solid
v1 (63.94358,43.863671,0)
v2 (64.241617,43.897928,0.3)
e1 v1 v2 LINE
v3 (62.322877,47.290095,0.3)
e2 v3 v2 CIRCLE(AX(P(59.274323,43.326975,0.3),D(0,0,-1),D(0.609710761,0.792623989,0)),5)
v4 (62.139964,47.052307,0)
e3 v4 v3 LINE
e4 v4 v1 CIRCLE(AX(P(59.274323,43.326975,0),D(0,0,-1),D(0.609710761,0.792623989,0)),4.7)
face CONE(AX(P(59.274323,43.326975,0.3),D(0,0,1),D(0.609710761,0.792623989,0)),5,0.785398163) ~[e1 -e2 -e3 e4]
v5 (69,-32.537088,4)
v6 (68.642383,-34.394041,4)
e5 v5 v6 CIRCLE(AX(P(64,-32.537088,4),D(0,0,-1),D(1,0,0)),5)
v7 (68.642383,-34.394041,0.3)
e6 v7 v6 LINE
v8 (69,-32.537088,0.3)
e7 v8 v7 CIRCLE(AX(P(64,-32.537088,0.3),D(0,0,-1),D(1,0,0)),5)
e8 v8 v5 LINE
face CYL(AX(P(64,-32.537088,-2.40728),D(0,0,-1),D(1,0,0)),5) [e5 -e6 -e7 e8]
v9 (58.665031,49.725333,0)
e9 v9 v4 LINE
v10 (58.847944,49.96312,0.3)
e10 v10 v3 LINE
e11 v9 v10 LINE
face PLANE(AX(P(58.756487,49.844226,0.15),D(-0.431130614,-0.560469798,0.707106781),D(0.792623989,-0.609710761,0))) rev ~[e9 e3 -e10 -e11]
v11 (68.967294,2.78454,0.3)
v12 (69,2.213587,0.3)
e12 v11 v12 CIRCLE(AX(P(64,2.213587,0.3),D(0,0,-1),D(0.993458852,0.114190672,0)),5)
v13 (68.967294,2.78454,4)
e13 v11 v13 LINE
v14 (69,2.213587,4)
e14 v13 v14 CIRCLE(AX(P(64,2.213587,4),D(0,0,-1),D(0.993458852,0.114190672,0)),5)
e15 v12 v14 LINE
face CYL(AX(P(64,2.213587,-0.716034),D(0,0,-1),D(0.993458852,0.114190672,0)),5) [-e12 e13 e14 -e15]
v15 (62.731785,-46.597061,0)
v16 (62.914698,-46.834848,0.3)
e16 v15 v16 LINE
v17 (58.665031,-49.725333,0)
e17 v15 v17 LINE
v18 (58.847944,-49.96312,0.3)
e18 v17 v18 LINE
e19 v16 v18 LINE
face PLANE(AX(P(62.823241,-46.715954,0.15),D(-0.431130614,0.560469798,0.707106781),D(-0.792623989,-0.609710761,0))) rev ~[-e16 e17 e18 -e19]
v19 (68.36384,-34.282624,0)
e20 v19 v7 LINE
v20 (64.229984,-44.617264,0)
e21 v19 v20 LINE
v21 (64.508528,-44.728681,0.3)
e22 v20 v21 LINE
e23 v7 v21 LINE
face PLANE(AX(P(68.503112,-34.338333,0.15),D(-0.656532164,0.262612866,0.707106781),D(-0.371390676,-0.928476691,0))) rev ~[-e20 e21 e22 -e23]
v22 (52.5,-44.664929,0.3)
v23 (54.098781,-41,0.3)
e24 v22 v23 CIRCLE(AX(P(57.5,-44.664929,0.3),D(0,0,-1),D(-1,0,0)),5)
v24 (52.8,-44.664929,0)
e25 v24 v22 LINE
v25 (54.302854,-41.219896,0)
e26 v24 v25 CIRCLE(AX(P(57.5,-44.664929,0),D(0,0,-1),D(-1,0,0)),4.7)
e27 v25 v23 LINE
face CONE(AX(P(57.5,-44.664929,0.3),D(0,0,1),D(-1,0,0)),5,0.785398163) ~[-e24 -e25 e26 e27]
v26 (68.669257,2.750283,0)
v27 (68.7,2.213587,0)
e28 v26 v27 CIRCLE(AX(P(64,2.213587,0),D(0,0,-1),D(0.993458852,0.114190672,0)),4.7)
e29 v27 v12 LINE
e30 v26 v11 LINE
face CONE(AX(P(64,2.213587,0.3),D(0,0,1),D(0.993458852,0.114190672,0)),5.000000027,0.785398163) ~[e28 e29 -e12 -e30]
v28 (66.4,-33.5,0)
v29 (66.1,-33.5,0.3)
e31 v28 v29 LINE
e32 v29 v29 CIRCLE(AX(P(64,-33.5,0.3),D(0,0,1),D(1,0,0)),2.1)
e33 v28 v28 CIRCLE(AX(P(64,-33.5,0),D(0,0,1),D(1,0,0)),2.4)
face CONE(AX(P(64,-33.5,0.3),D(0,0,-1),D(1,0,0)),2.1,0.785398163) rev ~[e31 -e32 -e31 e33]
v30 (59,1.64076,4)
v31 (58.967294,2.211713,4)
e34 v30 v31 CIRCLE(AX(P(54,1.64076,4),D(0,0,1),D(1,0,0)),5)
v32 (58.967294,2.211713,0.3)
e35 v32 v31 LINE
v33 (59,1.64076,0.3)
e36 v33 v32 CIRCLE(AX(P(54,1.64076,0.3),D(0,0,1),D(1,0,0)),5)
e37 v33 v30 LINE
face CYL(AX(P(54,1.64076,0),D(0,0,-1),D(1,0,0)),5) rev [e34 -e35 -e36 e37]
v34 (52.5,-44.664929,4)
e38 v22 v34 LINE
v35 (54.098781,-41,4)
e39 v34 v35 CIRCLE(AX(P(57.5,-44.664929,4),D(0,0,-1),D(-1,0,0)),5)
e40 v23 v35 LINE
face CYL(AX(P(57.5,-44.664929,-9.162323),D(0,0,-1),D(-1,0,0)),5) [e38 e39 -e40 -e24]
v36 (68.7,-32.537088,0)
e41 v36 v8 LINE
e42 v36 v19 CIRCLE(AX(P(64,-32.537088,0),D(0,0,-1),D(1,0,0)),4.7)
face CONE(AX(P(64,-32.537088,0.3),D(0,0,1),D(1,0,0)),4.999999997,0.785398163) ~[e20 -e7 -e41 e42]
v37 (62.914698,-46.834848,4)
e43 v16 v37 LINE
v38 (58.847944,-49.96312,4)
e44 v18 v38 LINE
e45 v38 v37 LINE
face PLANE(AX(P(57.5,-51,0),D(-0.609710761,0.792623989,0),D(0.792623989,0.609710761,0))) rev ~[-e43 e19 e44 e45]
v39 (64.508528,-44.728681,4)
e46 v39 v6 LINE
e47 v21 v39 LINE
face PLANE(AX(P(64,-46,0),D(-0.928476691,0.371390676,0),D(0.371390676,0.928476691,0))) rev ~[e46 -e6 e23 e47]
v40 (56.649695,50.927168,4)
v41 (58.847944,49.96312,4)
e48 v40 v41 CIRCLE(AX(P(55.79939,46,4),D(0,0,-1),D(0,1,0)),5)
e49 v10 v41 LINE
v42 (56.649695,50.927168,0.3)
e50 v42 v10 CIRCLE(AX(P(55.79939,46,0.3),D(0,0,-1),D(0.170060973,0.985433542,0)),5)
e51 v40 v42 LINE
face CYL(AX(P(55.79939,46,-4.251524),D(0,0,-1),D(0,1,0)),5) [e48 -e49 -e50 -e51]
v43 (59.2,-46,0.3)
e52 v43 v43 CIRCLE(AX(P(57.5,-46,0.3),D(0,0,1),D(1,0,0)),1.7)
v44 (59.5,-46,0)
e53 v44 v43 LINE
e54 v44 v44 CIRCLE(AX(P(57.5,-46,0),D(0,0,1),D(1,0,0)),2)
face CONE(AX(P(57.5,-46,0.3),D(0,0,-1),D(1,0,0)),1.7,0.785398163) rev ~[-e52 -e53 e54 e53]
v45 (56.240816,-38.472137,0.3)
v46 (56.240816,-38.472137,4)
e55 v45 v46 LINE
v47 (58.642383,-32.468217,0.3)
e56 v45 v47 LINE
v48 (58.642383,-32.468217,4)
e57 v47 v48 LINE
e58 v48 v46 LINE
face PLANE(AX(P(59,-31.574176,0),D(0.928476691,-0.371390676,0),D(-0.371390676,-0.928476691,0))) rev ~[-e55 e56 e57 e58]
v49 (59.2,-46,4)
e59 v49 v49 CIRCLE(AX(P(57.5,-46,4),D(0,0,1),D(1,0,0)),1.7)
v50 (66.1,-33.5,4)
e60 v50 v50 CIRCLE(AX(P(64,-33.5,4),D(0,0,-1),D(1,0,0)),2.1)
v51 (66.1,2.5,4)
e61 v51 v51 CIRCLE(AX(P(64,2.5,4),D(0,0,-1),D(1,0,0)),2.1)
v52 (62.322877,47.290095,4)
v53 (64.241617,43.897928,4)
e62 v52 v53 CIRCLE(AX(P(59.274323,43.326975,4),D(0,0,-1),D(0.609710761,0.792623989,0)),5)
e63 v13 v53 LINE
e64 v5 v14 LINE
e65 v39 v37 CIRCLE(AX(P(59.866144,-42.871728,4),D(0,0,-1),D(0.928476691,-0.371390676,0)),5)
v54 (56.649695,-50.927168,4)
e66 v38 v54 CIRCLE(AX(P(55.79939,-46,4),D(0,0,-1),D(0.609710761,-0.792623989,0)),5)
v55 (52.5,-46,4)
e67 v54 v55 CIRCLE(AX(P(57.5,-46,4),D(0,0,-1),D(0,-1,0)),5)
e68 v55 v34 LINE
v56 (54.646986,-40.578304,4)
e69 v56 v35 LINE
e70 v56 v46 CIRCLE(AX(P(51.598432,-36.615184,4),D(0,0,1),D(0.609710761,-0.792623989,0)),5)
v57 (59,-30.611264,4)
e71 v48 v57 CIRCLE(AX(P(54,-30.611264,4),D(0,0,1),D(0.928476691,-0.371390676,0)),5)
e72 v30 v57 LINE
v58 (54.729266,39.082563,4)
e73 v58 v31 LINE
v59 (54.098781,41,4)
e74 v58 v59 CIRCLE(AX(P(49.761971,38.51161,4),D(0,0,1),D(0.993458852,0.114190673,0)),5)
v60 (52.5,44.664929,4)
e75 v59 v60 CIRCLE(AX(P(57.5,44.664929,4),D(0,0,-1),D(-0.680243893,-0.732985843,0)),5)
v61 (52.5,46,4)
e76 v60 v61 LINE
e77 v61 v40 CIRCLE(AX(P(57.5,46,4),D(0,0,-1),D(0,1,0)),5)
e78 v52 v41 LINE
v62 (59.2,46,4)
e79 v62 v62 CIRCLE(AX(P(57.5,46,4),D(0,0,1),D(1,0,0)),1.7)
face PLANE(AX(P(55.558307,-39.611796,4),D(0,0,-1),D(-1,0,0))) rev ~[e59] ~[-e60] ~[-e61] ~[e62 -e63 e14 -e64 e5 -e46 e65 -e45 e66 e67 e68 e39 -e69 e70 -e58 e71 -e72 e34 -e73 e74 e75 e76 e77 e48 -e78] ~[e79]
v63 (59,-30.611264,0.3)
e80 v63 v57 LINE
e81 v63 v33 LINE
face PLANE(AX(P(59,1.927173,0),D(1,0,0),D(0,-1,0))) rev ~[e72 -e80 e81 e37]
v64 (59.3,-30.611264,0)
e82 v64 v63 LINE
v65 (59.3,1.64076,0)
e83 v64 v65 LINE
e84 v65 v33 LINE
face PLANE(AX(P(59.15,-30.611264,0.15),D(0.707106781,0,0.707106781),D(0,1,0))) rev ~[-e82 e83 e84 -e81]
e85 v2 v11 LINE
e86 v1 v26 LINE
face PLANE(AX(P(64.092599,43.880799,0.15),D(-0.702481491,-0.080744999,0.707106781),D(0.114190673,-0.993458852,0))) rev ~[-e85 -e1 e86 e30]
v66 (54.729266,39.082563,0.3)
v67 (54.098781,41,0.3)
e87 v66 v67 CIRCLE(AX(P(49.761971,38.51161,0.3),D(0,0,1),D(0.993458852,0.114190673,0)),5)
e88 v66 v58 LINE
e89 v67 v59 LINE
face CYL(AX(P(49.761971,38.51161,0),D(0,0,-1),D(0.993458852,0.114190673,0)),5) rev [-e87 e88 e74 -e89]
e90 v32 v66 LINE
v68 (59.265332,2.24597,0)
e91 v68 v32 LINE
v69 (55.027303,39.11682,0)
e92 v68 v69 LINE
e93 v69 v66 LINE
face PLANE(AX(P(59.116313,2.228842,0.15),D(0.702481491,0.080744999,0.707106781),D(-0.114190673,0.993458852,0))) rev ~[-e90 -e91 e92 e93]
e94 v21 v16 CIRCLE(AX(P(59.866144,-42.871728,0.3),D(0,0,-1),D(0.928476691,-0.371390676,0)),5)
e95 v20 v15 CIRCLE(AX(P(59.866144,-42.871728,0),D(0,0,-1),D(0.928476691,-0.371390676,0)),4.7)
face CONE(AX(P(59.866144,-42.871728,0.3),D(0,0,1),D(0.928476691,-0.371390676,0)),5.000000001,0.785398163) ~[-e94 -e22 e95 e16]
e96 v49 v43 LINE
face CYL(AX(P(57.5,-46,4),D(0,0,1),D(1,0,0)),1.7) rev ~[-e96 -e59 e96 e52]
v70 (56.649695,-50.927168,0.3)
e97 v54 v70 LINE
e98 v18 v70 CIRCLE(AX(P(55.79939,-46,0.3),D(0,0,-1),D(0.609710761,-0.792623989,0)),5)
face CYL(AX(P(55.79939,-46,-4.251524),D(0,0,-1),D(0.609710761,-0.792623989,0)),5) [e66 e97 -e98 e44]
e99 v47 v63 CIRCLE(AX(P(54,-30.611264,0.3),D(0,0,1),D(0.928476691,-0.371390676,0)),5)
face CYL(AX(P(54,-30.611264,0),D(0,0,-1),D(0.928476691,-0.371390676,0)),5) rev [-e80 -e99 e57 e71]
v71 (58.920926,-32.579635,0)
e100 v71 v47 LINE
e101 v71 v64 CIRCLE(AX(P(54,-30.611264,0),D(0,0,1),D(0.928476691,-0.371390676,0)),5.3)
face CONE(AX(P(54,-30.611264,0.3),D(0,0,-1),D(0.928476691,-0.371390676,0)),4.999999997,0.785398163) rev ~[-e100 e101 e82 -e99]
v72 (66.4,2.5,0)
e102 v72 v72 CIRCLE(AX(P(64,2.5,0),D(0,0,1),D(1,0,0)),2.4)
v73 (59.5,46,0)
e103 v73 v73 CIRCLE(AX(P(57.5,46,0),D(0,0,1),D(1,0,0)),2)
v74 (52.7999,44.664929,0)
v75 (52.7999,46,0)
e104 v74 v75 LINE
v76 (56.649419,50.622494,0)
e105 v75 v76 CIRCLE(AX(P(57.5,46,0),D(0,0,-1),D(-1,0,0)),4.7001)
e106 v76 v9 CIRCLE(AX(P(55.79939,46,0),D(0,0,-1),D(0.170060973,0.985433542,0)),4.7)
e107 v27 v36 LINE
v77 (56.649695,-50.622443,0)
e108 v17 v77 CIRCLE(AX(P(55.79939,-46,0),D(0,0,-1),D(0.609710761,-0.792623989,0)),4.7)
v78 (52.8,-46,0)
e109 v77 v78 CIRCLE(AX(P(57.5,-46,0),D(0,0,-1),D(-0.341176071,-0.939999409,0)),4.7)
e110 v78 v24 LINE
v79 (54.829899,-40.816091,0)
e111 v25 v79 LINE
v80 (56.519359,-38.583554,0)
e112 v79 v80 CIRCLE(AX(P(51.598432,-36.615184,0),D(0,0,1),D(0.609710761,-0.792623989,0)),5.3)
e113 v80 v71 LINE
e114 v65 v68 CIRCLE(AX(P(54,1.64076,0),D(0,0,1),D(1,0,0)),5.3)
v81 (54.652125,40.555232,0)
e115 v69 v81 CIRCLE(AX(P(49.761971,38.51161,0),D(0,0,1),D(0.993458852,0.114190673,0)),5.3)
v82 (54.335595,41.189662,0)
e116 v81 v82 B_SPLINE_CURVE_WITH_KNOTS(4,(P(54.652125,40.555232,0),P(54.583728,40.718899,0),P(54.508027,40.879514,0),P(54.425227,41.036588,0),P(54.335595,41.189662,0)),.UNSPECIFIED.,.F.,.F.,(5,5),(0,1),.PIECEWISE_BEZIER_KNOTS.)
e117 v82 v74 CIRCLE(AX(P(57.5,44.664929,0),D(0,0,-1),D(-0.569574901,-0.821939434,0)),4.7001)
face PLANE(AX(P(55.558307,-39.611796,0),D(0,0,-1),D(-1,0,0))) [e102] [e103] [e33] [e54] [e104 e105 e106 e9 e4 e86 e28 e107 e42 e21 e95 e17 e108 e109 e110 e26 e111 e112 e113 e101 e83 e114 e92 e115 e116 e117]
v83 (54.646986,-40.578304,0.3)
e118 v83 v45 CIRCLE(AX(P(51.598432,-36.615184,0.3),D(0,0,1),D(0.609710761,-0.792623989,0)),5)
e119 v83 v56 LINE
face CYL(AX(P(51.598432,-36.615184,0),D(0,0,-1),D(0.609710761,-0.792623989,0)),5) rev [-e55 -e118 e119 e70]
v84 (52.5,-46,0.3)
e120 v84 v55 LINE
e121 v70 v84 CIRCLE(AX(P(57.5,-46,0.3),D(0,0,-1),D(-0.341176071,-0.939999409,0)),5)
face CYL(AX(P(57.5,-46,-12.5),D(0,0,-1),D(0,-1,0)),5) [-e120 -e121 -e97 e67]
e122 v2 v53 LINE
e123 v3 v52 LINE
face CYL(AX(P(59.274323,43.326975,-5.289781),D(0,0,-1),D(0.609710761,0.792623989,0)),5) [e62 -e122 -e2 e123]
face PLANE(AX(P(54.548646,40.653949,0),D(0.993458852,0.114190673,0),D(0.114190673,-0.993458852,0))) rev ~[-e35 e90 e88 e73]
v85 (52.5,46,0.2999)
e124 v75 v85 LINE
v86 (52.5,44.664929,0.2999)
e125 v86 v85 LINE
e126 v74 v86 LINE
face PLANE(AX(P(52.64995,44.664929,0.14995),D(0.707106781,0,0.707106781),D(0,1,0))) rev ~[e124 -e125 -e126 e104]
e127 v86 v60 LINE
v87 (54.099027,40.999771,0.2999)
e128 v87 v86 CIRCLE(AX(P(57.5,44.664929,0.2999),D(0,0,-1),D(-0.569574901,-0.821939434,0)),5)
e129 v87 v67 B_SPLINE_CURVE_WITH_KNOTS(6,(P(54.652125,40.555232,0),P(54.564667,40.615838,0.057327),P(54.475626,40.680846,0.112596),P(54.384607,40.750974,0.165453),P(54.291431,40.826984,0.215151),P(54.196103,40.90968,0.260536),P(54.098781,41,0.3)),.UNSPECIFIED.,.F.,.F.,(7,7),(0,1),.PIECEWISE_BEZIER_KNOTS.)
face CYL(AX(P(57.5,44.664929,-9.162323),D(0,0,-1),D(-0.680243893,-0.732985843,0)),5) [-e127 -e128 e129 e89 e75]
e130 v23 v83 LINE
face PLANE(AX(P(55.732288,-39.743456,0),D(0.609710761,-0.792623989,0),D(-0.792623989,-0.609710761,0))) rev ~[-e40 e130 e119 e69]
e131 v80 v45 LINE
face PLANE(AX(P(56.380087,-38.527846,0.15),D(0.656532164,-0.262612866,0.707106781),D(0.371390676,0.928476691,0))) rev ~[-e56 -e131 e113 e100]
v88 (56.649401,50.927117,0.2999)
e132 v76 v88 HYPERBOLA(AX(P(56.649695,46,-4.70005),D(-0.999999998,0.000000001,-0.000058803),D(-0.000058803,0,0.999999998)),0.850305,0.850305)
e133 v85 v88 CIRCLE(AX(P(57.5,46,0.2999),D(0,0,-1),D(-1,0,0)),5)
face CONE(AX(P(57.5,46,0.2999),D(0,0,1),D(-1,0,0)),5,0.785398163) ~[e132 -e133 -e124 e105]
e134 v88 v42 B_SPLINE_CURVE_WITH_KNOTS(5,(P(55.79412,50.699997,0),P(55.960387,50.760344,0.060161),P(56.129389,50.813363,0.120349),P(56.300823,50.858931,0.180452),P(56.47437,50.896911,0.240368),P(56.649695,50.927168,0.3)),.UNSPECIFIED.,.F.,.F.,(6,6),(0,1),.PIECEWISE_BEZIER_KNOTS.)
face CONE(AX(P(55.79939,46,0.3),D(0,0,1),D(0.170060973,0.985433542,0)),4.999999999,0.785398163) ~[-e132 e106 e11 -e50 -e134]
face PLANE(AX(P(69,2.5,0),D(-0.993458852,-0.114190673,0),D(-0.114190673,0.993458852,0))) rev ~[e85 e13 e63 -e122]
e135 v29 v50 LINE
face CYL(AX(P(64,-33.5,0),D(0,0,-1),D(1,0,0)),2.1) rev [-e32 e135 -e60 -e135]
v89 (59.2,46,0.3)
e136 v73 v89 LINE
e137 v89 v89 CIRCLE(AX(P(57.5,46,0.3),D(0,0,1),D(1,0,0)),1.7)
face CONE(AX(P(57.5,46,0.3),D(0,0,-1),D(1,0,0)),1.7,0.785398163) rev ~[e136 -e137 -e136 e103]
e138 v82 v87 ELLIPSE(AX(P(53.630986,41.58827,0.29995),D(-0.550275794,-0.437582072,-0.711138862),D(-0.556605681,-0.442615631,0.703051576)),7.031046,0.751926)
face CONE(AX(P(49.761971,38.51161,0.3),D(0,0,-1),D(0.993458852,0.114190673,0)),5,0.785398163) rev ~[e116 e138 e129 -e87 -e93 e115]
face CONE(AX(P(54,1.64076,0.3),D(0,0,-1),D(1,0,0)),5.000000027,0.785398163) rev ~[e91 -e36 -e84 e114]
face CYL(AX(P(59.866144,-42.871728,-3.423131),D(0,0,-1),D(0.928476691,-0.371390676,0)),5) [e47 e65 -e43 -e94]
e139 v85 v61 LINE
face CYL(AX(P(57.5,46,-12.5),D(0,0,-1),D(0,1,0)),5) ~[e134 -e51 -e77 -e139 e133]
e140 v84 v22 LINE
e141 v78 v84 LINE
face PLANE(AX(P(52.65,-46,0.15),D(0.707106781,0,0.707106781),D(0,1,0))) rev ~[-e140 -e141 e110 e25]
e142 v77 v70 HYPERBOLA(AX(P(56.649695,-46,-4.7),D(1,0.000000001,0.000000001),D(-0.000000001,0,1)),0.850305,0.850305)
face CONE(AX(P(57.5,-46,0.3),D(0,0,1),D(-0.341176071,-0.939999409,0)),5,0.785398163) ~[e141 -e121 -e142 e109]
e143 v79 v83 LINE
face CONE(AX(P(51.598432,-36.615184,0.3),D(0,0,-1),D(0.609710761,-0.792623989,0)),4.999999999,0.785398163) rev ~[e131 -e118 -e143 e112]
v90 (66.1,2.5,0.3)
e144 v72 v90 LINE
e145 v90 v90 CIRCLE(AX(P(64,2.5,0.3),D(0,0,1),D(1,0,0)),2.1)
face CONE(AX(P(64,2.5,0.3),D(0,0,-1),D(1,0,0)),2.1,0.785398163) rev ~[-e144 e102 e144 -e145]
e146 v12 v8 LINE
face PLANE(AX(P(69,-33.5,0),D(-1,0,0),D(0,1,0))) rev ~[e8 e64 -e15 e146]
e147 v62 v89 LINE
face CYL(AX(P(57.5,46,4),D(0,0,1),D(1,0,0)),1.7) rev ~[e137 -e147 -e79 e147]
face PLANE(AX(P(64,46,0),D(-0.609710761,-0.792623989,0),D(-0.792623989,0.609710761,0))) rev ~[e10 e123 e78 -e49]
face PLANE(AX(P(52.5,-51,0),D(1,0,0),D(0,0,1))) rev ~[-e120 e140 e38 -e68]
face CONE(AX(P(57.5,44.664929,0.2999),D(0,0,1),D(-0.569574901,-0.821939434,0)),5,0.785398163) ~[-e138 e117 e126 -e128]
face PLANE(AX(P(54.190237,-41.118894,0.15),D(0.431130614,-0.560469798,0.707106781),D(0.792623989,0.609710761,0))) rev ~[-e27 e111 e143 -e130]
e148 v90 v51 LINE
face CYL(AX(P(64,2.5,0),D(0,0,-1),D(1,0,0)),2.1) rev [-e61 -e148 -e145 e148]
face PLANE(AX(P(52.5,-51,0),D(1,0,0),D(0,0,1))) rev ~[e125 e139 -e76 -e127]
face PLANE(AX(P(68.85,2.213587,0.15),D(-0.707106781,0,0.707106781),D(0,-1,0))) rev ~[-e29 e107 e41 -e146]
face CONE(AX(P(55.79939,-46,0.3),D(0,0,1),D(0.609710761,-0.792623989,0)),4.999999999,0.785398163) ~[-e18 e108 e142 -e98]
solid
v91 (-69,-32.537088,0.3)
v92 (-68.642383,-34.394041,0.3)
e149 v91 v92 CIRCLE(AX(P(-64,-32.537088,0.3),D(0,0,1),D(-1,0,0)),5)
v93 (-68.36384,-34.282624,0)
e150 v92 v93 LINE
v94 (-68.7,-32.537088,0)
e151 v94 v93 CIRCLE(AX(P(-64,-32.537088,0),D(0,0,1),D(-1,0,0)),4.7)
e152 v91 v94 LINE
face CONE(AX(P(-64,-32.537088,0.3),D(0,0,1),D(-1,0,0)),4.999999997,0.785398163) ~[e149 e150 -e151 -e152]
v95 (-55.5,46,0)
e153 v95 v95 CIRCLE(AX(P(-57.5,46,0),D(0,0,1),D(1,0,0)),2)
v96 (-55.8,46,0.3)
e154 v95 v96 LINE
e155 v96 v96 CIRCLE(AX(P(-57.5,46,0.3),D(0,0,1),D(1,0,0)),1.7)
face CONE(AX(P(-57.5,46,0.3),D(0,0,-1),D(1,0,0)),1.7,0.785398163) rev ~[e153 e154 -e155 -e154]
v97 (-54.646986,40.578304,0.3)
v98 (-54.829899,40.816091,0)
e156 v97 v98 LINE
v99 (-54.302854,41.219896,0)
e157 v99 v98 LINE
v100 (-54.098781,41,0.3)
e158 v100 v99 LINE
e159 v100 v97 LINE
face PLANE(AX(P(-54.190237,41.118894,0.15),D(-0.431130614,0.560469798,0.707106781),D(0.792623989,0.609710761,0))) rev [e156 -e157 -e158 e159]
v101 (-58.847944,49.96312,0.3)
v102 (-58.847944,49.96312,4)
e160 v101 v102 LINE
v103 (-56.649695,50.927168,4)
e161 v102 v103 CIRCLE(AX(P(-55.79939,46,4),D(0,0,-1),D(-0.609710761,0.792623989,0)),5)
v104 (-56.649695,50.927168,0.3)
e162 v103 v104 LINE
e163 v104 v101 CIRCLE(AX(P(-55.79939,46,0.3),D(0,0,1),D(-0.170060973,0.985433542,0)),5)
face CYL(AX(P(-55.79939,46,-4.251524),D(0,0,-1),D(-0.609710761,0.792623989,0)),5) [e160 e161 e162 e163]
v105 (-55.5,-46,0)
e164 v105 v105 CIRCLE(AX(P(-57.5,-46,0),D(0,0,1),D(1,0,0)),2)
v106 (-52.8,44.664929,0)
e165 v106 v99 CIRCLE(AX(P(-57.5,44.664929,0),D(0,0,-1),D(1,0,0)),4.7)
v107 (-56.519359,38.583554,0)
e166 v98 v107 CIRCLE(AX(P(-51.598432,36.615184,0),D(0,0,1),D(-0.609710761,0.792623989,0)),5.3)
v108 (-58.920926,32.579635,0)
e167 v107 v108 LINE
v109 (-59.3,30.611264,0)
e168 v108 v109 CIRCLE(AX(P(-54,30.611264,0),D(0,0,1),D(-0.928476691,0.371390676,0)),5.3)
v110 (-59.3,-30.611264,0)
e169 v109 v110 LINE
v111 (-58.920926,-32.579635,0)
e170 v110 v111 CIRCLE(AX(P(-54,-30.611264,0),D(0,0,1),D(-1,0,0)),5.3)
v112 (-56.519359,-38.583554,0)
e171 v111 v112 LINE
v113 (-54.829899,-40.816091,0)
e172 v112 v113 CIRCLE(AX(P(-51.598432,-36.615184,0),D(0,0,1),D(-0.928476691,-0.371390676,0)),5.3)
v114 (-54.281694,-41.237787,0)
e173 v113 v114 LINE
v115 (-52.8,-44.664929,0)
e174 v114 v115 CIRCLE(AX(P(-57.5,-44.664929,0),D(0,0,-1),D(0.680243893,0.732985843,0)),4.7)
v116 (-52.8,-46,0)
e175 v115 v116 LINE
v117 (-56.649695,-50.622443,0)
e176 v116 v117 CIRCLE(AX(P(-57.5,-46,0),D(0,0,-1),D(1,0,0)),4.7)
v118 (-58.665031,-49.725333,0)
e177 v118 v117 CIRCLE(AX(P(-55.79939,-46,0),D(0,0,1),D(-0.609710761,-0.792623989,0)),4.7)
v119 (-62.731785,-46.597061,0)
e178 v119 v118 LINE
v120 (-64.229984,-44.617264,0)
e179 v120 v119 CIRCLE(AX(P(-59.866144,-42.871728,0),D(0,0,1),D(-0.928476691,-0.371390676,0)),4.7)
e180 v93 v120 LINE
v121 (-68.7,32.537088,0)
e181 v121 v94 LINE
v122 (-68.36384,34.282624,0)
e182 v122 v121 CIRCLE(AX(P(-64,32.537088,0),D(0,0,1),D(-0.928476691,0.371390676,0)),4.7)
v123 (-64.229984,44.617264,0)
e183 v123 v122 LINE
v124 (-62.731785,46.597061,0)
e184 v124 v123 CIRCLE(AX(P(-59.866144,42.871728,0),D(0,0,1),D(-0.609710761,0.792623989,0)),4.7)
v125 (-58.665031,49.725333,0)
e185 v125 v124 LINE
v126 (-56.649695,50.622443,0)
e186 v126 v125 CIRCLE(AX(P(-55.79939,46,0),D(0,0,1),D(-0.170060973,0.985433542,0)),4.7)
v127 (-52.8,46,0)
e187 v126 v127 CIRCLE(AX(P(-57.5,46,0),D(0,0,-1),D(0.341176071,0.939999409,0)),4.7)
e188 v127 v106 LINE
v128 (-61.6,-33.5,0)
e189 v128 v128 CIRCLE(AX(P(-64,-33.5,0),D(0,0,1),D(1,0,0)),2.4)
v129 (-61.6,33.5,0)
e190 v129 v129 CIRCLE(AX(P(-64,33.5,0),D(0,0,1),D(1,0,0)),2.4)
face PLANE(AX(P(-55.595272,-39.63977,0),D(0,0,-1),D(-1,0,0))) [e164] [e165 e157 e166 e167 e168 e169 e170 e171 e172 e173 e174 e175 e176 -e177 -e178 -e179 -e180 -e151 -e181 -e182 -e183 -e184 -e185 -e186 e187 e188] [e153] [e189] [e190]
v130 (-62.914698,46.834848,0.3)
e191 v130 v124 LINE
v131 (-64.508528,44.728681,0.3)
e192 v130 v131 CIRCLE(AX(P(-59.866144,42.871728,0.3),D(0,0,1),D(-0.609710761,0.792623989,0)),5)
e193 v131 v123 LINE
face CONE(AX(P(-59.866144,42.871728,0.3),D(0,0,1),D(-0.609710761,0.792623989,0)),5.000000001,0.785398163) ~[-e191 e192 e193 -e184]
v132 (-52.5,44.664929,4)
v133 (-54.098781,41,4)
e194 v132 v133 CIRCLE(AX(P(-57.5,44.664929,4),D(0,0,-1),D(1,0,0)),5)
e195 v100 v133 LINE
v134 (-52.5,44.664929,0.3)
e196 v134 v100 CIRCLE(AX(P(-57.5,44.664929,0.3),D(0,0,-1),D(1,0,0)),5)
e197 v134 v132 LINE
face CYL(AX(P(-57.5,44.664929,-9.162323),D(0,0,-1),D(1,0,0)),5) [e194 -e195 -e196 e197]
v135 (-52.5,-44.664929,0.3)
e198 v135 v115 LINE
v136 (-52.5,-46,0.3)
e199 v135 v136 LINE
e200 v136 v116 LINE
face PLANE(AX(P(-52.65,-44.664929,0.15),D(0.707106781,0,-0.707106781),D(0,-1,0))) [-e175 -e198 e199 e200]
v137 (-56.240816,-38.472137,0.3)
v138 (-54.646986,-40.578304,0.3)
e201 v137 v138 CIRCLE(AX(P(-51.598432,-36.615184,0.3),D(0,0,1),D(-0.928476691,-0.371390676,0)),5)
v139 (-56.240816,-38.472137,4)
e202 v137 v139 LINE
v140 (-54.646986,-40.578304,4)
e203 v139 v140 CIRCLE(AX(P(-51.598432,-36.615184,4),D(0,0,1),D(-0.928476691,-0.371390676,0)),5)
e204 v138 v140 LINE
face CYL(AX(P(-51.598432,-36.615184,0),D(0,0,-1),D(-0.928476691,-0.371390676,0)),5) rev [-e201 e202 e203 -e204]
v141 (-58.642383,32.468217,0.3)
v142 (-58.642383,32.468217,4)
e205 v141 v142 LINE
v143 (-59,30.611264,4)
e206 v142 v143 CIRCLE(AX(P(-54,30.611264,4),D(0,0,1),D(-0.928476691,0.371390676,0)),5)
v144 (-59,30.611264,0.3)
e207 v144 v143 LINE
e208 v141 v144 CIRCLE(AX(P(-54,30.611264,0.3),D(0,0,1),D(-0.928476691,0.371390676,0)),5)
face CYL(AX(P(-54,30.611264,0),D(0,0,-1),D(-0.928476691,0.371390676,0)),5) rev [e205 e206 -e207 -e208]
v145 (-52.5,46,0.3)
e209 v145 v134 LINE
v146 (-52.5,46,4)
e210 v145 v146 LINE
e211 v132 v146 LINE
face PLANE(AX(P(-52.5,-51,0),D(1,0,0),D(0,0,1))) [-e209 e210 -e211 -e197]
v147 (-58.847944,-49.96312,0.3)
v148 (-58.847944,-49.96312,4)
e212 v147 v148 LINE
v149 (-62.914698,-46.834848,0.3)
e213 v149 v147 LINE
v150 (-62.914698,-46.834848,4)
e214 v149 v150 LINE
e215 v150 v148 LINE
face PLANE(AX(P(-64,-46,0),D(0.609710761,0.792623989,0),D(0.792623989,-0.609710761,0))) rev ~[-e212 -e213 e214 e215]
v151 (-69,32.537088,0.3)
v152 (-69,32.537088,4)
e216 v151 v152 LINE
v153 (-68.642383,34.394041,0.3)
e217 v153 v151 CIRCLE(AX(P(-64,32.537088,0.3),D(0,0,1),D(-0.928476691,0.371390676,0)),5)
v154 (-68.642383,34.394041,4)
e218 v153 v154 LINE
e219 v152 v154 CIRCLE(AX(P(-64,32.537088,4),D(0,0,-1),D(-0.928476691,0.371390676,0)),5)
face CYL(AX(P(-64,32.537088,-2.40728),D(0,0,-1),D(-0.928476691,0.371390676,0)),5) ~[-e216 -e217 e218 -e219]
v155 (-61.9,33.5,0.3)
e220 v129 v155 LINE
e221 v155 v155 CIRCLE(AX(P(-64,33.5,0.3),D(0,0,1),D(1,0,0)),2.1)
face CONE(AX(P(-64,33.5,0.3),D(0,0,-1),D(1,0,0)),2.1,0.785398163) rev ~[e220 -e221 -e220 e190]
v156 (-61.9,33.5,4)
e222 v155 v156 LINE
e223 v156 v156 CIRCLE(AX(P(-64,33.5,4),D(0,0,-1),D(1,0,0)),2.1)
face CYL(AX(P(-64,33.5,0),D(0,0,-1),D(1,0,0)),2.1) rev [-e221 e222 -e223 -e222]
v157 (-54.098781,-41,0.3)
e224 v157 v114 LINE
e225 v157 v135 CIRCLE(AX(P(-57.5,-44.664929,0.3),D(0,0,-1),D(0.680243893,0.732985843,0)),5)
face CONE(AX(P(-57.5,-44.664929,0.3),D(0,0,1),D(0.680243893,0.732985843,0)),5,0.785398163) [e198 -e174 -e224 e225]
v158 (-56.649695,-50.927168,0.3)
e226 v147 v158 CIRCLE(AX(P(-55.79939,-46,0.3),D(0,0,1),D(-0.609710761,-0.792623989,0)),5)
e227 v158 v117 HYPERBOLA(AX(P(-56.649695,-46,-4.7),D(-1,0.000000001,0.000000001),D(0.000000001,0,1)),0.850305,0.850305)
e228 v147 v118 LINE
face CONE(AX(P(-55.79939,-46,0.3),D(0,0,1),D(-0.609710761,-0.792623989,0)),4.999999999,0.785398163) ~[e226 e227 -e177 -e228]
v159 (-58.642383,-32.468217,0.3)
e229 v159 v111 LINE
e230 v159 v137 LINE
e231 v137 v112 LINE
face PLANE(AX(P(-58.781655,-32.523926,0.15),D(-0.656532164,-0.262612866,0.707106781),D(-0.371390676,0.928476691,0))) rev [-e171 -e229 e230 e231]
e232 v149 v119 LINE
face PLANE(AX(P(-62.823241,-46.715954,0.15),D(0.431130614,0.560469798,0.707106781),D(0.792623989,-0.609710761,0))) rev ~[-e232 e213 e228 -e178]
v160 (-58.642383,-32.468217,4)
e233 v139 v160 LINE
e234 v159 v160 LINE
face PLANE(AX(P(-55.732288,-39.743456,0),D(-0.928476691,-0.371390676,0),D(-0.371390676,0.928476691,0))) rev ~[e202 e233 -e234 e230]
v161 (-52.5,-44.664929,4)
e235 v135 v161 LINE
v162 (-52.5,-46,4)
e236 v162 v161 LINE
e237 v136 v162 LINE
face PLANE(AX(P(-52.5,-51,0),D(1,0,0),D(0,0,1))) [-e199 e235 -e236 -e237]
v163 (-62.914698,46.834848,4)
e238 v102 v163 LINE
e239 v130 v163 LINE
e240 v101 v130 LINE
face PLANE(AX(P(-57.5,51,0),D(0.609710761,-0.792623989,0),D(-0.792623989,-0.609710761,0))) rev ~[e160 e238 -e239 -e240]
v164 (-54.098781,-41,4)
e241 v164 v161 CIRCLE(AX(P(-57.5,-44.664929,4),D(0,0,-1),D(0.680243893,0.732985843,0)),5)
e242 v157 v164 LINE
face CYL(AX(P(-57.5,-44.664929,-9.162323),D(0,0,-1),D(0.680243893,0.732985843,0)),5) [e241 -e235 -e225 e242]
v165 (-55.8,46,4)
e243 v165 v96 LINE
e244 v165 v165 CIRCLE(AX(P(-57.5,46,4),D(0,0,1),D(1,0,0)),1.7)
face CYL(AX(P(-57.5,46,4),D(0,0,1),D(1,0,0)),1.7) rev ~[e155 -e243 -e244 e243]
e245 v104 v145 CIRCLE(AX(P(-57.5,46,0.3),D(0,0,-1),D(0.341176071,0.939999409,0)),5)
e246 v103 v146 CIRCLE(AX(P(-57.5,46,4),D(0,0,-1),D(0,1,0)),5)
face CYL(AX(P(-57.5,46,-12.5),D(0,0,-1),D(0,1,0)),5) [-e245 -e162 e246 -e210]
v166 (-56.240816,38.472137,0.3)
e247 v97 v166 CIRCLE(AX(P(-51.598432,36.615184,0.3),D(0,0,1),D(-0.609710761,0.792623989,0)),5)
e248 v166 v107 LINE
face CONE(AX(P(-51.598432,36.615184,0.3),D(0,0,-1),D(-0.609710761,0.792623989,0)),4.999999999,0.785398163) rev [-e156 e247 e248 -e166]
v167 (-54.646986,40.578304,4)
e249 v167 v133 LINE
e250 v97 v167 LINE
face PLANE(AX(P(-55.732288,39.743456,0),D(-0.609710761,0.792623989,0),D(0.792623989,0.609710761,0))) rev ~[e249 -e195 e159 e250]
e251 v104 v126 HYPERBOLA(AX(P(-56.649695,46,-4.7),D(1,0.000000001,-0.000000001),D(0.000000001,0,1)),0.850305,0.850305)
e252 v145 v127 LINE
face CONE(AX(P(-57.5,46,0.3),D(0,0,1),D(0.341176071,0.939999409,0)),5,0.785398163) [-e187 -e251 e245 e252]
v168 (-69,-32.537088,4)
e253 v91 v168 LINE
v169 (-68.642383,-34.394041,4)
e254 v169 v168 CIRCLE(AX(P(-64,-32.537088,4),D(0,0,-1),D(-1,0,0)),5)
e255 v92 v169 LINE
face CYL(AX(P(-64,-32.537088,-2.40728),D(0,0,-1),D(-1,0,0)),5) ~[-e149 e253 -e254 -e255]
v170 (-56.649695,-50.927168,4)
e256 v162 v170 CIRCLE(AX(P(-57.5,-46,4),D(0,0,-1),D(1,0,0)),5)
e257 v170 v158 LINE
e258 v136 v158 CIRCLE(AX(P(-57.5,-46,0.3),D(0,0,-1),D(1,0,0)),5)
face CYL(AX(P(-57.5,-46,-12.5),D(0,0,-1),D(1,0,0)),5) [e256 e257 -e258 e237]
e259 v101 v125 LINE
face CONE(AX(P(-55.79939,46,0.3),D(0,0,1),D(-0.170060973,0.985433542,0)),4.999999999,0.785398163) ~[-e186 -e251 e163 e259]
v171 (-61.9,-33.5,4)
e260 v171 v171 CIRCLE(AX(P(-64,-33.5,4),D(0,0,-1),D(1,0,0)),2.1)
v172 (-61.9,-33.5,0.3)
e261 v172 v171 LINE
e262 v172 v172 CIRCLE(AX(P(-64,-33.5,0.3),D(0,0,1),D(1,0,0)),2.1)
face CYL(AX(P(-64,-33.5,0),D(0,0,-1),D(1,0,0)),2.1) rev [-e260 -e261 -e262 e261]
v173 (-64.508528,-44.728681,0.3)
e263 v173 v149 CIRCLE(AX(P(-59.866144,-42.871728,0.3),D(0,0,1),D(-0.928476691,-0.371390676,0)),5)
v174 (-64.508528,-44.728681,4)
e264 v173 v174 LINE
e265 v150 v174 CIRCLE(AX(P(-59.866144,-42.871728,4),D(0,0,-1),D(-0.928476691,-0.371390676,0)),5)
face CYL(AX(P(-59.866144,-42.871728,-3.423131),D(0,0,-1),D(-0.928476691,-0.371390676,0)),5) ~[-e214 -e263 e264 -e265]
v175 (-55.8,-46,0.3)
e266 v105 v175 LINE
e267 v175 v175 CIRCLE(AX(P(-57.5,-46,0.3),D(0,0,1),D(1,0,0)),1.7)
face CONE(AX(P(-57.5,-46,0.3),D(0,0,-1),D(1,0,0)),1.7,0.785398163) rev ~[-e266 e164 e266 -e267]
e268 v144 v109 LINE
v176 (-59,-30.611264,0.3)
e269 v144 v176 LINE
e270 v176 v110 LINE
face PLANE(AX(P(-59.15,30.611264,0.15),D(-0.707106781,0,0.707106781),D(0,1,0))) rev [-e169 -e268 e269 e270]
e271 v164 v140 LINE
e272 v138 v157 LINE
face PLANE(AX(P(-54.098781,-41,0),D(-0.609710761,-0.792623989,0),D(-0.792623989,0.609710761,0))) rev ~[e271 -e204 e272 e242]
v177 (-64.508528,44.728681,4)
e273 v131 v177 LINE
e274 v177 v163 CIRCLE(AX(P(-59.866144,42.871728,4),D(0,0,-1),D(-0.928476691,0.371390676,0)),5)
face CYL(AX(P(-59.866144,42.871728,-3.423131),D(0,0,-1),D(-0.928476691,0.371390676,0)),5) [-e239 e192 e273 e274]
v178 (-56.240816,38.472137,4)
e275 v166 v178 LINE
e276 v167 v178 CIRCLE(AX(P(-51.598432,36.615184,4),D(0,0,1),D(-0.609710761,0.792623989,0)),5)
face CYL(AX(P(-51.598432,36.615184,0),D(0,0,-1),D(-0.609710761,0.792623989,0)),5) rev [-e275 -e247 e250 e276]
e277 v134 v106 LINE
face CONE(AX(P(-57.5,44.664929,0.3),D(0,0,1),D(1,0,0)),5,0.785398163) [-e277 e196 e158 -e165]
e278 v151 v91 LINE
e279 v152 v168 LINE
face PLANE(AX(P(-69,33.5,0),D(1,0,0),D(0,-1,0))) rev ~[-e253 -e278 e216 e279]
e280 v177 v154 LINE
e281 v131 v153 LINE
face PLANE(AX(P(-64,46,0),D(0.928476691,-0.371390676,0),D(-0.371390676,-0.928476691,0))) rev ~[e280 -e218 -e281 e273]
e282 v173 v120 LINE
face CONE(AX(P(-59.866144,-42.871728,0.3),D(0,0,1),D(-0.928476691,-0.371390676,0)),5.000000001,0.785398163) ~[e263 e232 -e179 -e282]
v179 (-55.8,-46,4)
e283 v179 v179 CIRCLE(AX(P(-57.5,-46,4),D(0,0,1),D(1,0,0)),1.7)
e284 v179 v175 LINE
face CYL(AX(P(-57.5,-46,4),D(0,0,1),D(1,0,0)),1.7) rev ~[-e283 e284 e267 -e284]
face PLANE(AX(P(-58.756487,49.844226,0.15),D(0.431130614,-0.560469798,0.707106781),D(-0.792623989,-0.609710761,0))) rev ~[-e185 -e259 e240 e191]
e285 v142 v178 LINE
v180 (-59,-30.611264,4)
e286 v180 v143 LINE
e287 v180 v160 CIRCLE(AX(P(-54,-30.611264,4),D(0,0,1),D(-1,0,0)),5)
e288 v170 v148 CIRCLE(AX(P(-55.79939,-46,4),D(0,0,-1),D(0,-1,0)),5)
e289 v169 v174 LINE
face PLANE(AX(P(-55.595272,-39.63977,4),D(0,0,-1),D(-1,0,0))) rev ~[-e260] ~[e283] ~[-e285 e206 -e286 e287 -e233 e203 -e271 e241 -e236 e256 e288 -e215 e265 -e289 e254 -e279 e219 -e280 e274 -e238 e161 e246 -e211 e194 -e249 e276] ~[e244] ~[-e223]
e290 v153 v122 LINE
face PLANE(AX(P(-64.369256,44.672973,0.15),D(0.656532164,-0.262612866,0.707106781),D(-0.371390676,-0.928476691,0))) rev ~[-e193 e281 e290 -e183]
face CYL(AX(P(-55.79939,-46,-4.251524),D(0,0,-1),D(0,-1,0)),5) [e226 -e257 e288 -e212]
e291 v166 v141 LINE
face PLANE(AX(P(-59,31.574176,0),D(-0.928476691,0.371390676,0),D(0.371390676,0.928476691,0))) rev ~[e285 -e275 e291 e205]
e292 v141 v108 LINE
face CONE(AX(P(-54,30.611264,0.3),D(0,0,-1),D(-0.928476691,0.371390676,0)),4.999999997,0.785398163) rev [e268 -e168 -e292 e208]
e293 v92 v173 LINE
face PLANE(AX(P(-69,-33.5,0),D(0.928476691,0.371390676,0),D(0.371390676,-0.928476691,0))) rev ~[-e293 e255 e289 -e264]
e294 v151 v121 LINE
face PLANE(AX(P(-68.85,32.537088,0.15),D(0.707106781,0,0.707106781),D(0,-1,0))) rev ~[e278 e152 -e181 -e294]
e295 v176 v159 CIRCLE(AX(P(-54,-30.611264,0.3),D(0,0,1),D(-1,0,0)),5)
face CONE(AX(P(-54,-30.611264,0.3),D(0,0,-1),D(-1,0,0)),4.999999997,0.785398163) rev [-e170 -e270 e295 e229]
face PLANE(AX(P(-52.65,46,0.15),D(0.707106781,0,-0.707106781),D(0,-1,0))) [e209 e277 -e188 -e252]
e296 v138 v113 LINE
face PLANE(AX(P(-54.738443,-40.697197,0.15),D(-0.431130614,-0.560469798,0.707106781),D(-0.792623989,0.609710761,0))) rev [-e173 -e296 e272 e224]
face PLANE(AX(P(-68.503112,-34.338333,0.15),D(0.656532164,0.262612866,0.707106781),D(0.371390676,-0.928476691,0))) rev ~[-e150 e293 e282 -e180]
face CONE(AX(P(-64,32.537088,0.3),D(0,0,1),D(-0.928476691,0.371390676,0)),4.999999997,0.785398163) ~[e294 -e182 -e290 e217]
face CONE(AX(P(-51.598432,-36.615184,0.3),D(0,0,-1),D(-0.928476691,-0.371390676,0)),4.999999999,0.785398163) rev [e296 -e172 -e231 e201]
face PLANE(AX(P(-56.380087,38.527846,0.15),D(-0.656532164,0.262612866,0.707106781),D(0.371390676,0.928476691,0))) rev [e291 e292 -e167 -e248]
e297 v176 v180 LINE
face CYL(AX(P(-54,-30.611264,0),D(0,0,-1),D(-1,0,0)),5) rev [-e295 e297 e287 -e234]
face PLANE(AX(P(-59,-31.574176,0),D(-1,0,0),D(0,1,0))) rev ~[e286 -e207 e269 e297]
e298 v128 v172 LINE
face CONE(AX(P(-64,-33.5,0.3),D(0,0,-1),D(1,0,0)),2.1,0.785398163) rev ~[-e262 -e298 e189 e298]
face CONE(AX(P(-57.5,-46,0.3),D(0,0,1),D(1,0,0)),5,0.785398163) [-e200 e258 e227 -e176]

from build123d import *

# Parameters (mm, degrees)
F3_DEPTH        = 4
F0_R            = 2.1
F4_DEPTH        = 4.001
F5_R            = 1.7
F6_DEPTH        = 4.001
F7_W            = 105
F7_H            = 4
F8_DEPTH        = 102.001
F9_T1_DEPTH     = 29
F9_T3_DEPTH     = 12.5030486671
F9_T5_DEPTH     = 10.8462610372
F9_T7_DEPTH     = 8.8145600892
F9_T9_DEPTH     = 22.3246460663
F9_T11_DEPTH    = 4
F9_S1_T1_DEPTH  = 4
F9_S1_T3_DEPTH  = 12.5030486671
F9_S1_T5_DEPTH  = 10.8462610372
F9_S1_T7_DEPTH  = 8.8145600892
F9_S1_T9_DEPTH  = 29
F9_S1_T11_DEPTH = 22.3246460663
F9_S1_T13_DEPTH = 14.5795623731
F9_S1_T15_DEPTH = 5.4320670893
F10_C1_SIZE     = 0.3
F10_C2_SIZE     = 0.3
F10_C3_SIZE     = 0.2999
F10_C4_SIZE     = 0.3
F10_C5_SIZE     = 0.3
F10_C6_SIZE     = 0.3
F10_C7_SIZE     = 0.3
F10_S1_C1_SIZE  = 0.3
F10_S1_C2_SIZE  = 0.3
F10_S1_C3_SIZE  = 0.3
F10_S1_C4_SIZE  = 0.3
F10_S1_C5_SIZE  = 0.3
F10_S1_C6_SIZE  = 0.3


# Not quite as in the source:
# - a fillet or chamfer that OpenCascade refuses, or shapes differently, is made with other operations: its cross-section is extruded or revolved along the edge and cut away or added
# - a fillet or chamfer is up to 0.001 mm smaller than in the source, because OpenCascade refuses the exact size


with BuildPart() as f3:
    # F2 (on Top) → F3 (new body)
    with BuildSketch(Plane.XY):
        Polygon((-64, 46), (-69, 33.5), (-69, -33.5), (-64, -46), (-57.5, -51), (57.5, -51), (64, -46), (69, -33.5), (69, 2.5), (64, 46), (57.5, 51), (-57.5, 51), align=None)
        Polygon((59, -31.5741759643), (55.732288098, -39.7434557193), (54.0987805331, -41), (-54.0987805331, -41), (-55.732288098, -39.7434557193), (-59, -31.5741759643), (-59, 31.5741759643), (-55.732288098, 39.7434557193), (-54.0987805331, 41), (54.0987805331, 41), (54.5486464191, 40.6539493185), (59, 1.9271731643), align=None, mode=Mode.SUBTRACT)
    extrude(amount=F3_DEPTH)

    # F0 (on Top) → F4 (cut, through all)
    with BuildSketch(Plane.XY):
        with Locations((-64, 33.5)):
            Circle(F0_R)
        with Locations((-64, -33.5)):
            Circle(F0_R)
        with Locations((64, -33.5)):
            Circle(F0_R)
        with Locations((64, 2.5)):
            Circle(F0_R)
    extrude(amount=F4_DEPTH, mode=Mode.SUBTRACT)

    # F5 (on face) → F6 (cut, through all)
    with BuildSketch(Plane.XY.offset(4)):
        with Locations((-57.5, 46)):
            Circle(F5_R)
        with Locations((57.5, 46)):
            Circle(F5_R)
        with Locations((57.5, -46)):
            Circle(F5_R)
        with Locations((-57.5, -46)):
            Circle(F5_R)
    extrude(amount=-F6_DEPTH, mode=Mode.SUBTRACT)

    # F7 (on face) → F8 (cut, through all)
    with BuildSketch(Plane.XZ.offset(51)):
        with Locations((0, 2)):
            Rectangle(F7_W, F7_H)
    extrude(amount=-F8_DEPTH, mode=Mode.SUBTRACT)

    # F9: fillet of radius 5 on 14 edges, made by hand

    # F9_s2 → F9_t1 (cut)
    with BuildSketch(Plane.XY.offset(-12.5)):
        with BuildLine():
            ThreePointArc((-52.5, -46), (-53.9644660941, -49.5355339059), (-57.5, -51))
            Line((-57.5, -51), (-57.5, -51.1))
            Line((-57.5, -51.1), (-52.4, -51.1))
            Line((-52.4, -51.1), (-52.4, -46))
            Line((-52.4, -46), (-52.5, -46))
        make_face()
        with BuildLine():
            ThreePointArc((-57.5, 51), (-53.9644660941, 49.5355339059), (-52.5, 46))
            Line((-52.5, 46), (-52.4, 46))
            Line((-52.4, 46), (-52.4, 51.1))
            Line((-52.4, 51.1), (-57.5, 51.1))
            Line((-57.5, 51.1), (-57.5, 51))
        make_face()
    extrude(amount=F9_T1_DEPTH, mode=Mode.SUBTRACT)

    # F9_s4 → F9_t3 (cut)
    with BuildSketch(Plane.XY.offset(-4.2515243336)):
        with BuildLine():
            ThreePointArc((-55.7993902666, -51), (-57.4094213645, -50.7336877658), (-58.8479440708, -49.9631199455))
            Line((-58.8479440708, -49.9631199455), (-58.9089151469, -50.0423823444))
            Line((-58.9089151469, -50.0423823444), (-57.5340121947, -51.1))
            Line((-57.5340121947, -51.1), (-55.7993902666, -51.1))
            Line((-55.7993902666, -51.1), (-55.7993902666, -51))
        make_face()
        with BuildLine():
            ThreePointArc((-58.8479440708, 49.9631199455), (-57.4094213645, 50.7336877658), (-55.7993902666, 51))
            Line((-55.7993902666, 51), (-55.7993902666, 51.1))
            Line((-55.7993902666, 51.1), (-57.5340121947, 51.1))
            Line((-57.5340121947, 51.1), (-58.9089151469, 50.0423823444))
            Line((-58.9089151469, 50.0423823444), (-58.8479440708, 49.9631199455))
        make_face()
    extrude(amount=F9_T3_DEPTH, mode=Mode.SUBTRACT)

    # F9_s6 → F9_t5 (cut)
    with BuildSketch(Plane.XY.offset(-3.4231305186)):
        with BuildLine():
            ThreePointArc((-64.5085275034, -44.7286812414), (-63.8531997769, -45.8889097604), (-62.9146978532, -46.8348478052))
            Line((-62.9146978532, -46.8348478052), (-62.9756689293, -46.9141102041))
            Line((-62.9756689293, -46.9141102041), (-64.082677119, -46.0625654428))
            Line((-64.082677119, -46.0625654428), (-64.6013751725, -44.7658203091))
            Line((-64.6013751725, -44.7658203091), (-64.5085275034, -44.7286812414))
        make_face()
        with BuildLine():
            ThreePointArc((-64.5085275034, 44.7286812414), (-63.8531997769, 45.8889097604), (-62.9146978532, 46.8348478052))
            Line((-62.9146978532, 46.8348478052), (-62.9756689293, 46.9141102041))
            Line((-62.9756689293, 46.9141102041), (-64.082677119, 46.0625654428))
            Line((-64.082677119, 46.0625654428), (-64.6013751725, 44.7658203091))
            Line((-64.6013751725, 44.7658203091), (-64.5085275034, 44.7286812414))
        make_face()
    extrude(amount=F9_T5_DEPTH, mode=Mode.SUBTRACT)

    # F9_s8 → F9_t7 (cut)
    with BuildSketch(Plane.XY.offset(-2.4072800446)):
        with BuildLine():
            ThreePointArc((-69, -32.5370879822), (-68.9097819337, -33.4826255879), (-68.6423834544, -34.3940413639))
            Line((-68.6423834544, -34.3940413639), (-68.7352311235, -34.4311804316))
            Line((-68.7352311235, -34.4311804316), (-69.1, -33.5192582404))
            Line((-69.1, -33.5192582404), (-69.1, -32.5370879822))
            Line((-69.1, -32.5370879822), (-69, -32.5370879822))
        make_face()
        with BuildLine():
            ThreePointArc((-68.6423834544, 34.3940413639), (-68.9097819337, 33.4826255879), (-69, 32.5370879822))
            Line((-69, 32.5370879822), (-69.1, 32.5370879822))
            Line((-69.1, 32.5370879822), (-69.1, 33.5192582404))
            Line((-69.1, 33.5192582404), (-68.7352311235, 34.4311804316))
            Line((-68.7352311235, 34.4311804316), (-68.6423834544, 34.3940413639))
        make_face()
    extrude(amount=F9_T7_DEPTH, mode=Mode.SUBTRACT)

    # F9_s10 → F9_t9 (cut)
    with BuildSketch(Plane.XY.offset(-9.1623230332)):
        with BuildLine():
            ThreePointArc((-54.0987805331, -41), (-52.9170916803, -42.6656915253), (-52.5, -44.6649292133))
            Line((-52.5, -44.6649292133), (-52.4, -44.6649292133))
            Line((-52.4, -44.6649292133), (-52.4, -41))
            Line((-52.4, -41), (-52.5, -40.9))
            ThreePointArc((-52.5, -40.9), (-53.2993902666, -40.9), (-54.0307561438, -40.9267014157))
            Line((-54.0307561438, -40.9267014157), (-54.0987805331, -41))
        make_face()
        with BuildLine():
            ThreePointArc((-52.5, 44.6649292133), (-52.9170916803, 42.6656915253), (-54.0987805331, 41))
            Line((-54.0987805331, 41), (-54.0307561438, 40.9267014157))
            ThreePointArc((-54.0307561438, 40.9267014157), (-53.2993902666, 40.9), (-52.5, 40.9))
            Line((-52.5, 40.9), (-52.4, 41))
            Line((-52.4, 41), (-52.4, 44.6649292133))
            Line((-52.4, 44.6649292133), (-52.5, 44.6649292133))
        make_face()
    extrude(amount=F9_T9_DEPTH, mode=Mode.SUBTRACT)

    # F9_s12 → F9_t11 (join)
    with BuildSketch(Plane.XY):
        with BuildLine():
            ThreePointArc((-56.2408156014, -38.4721369608), (-55.5854878749, -39.6323654798), (-54.6469859512, -40.5783035245))
            Line((-54.6469859512, -40.5783035245), (-54.7079570273, -40.6575659235))
            Line((-54.7079570273, -40.6575659235), (-55.814965217, -39.8060211622))
            Line((-55.814965217, -39.8060211622), (-56.3336632705, -38.5092760284))
            Line((-56.3336632705, -38.5092760284), (-56.2408156014, -38.4721369608))
        make_face()
        with BuildLine():
            ThreePointArc((-59, -30.6112639465), (-58.9097819337, -31.5568015523), (-58.6423834544, -32.4682173283))
            Line((-58.6423834544, -32.4682173283), (-58.7352311235, -32.5053563959))
            Line((-58.7352311235, -32.5053563959), (-59.1, -31.5934342047))
            Line((-59.1, -31.5934342047), (-59.1, -30.6112639465))
            Line((-59.1, -30.6112639465), (-59, -30.6112639465))
        make_face()
        with BuildLine():
            ThreePointArc((-58.6423834544, 32.4682173283), (-58.9097819337, 31.5568015523), (-59, 30.6112639465))
            Line((-59, 30.6112639465), (-59.1, 30.6112639465))
            Line((-59.1, 30.6112639465), (-59.1, 31.5934342047))
            Line((-59.1, 31.5934342047), (-58.7352311235, 32.5053563959))
            Line((-58.7352311235, 32.5053563959), (-58.6423834544, 32.4682173283))
        make_face()
        with BuildLine():
            ThreePointArc((-54.6469859512, 40.5783035245), (-55.5854878749, 39.6323654798), (-56.2408156014, 38.4721369608))
            Line((-56.2408156014, 38.4721369608), (-56.3336632705, 38.5092760284))
            Line((-56.3336632705, 38.5092760284), (-55.814965217, 39.8060211622))
            Line((-55.814965217, 39.8060211622), (-54.7079570273, 40.6575659235))
            Line((-54.7079570273, 40.6575659235), (-54.6469859512, 40.5783035245))
        make_face()
    extrude(amount=F9_T11_DEPTH)

    # F9#s1: fillet of radius 5 on 14 edges, made by hand

    # F9_s1_s2 → F9_s1_t1 (join)
    with BuildSketch(Plane.XY):
        with BuildLine():
            ThreePointArc((54.6469859512, -40.5783035245), (55.5854878749, -39.6323654798), (56.2408156014, -38.4721369608))
            Line((56.2408156014, -38.4721369608), (55.732288098, -39.7434557193))
            Line((55.732288098, -39.7434557193), (54.6469859512, -40.5783035245))
        make_face()
        with BuildLine():
            ThreePointArc((58.6423834544, -32.4682173283), (58.9097819337, -31.5568015523), (59, -30.6112639465))
            Line((59, -30.6112639465), (59, -31.5741759643))
            Line((59, -31.5741759643), (58.6423834544, -32.4682173283))
        make_face()
        with BuildLine():
            ThreePointArc((59, 1.6407597464), (58.9918168684, 1.9267044125), (58.9672942592, 2.2117131095))
            Line((58.9672942592, 2.2117131095), (59, 1.9271731643))
            Line((59, 1.9271731643), (59, 1.6407597464))
        make_face()
        with BuildLine():
            ThreePointArc((54.7292655037, 39.0825632824), (54.511784567, 40.0734272586), (54.0987805331, 41))
            Line((54.0987805331, 41), (54.5486464191, 40.6539493185))
            Line((54.5486464191, 40.6539493185), (54.7292655037, 39.0825632824))
        make_face()
    extrude(amount=F9_S1_T1_DEPTH)

    # F9_s1_s4 → F9_s1_t3 (cut)
    with BuildSketch(Plane.XY.offset(-4.2515243336)):
        with BuildLine():
            ThreePointArc((58.8479440708, -49.9631199455), (57.4094213645, -50.7336877658), (55.7993902666, -51))
            Line((55.7993902666, -51), (57.5, -51))
            Line((57.5, -51), (58.8479440708, -49.9631199455))
        make_face()
        with BuildLine():
            ThreePointArc((55.7993902666, 51), (57.4094213645, 50.7336877658), (58.8479440708, 49.9631199455))
            Line((58.8479440708, 49.9631199455), (57.5, 51))
            Line((57.5, 51), (55.7993902666, 51))
        make_face()
    extrude(amount=F9_S1_T3_DEPTH, mode=Mode.SUBTRACT)

    # F9_s1_s6 → F9_s1_t5 (cut)
    with BuildSketch(Plane.XY.offset(-3.4231305186)):
        with BuildLine():
            ThreePointArc((64.5085275034, -44.7286812414), (63.8531997769, -45.8889097604), (62.9146978532, -46.8348478052))
            Line((62.9146978532, -46.8348478052), (64, -46))
            Line((64, -46), (64.5085275034, -44.7286812414))
        make_face()
    extrude(amount=F9_S1_T5_DEPTH, mode=Mode.SUBTRACT)

    # F9_s1_s8 → F9_s1_t7 (cut)
    with BuildSketch(Plane.XY.offset(-2.4072800446)):
        with BuildLine():
            ThreePointArc((69, -32.5370879822), (68.9097819337, -33.4826255879), (68.6423834544, -34.3940413639))
            Line((68.6423834544, -34.3940413639), (69, -33.5))
            Line((69, -33.5), (69, -32.5370879822))
        make_face()
    extrude(amount=F9_S1_T7_DEPTH, mode=Mode.SUBTRACT)

    # F9_s1_s10 → F9_s1_t9 (cut)
    with BuildSketch(Plane.XY.offset(-12.5)):
        with BuildLine():
            ThreePointArc((57.5, -51), (53.9644660941, -49.5355339059), (52.5, -46))
            Line((52.5, -46), (52.5, -51))
            Line((52.5, -51), (57.5, -51))
        make_face()
        with BuildLine():
            ThreePointArc((57.5, 51), (53.9644660941, 49.5355339059), (52.5, 46))
            Line((52.5, 46), (52.5, 51))
            Line((52.5, 51), (57.5, 51))
        make_face()
    extrude(amount=F9_S1_T9_DEPTH, mode=Mode.SUBTRACT)

    # F9_s1_s12 → F9_s1_t11 (cut)
    with BuildSketch(Plane.XY.offset(-9.1623230332)):
        with BuildLine():
            ThreePointArc((52.5, -44.6649292133), (52.9170916803, -42.6656915253), (54.0987805331, -41))
            Line((54.0987805331, -41), (52.5, -41))
            Line((52.5, -41), (52.5, -44.6649292133))
        make_face()
        with BuildLine():
            ThreePointArc((54.0987805331, 41), (52.9170916803, 42.6656915253), (52.5, 44.6649292133))
            Line((52.5, 44.6649292133), (52.5, 41))
            Line((52.5, 41), (54.0987805331, 41))
        make_face()
    extrude(amount=F9_S1_T11_DEPTH, mode=Mode.SUBTRACT)

    # F9_s1_s14 → F9_s1_t13 (cut)
    with BuildSketch(Plane.XY.offset(-5.2897811865)):
        with BuildLine():
            ThreePointArc((62.3228770138, 47.2900946048), (63.626351883, 45.7886501914), (64.2416174687, 43.8979280224))
            Line((64.2416174687, 43.8979280224), (64, 46))
            Line((64, 46), (62.3228770138, 47.2900946048))
        make_face()
    extrude(amount=F9_S1_T13_DEPTH, mode=Mode.SUBTRACT)

    # F9_s1_s16 → F9_s1_t15 (cut)
    with BuildSketch(Plane.XY.offset(-0.7160335447)):
        with BuildLine():
            ThreePointArc((68.9672942592, 2.7845399453), (68.9918168684, 2.4995312483), (69, 2.2135865821))
            Line((69, 2.2135865821), (69, 2.5))
            Line((69, 2.5), (68.9672942592, 2.7845399453))
        make_face()
    extrude(amount=F9_S1_T15_DEPTH, mode=Mode.SUBTRACT)

    # F10: chamfer of 0.3 on 29 edges, made by hand

    # F10_c1
    f10_c1_edges = [f3.edges().sort_by_distance(p)[0] for p in [
        (57.8075291455, 50.5790149861, 0),
        (60.5854105423, 48.6266072752, 0),
        (63.626351883, 45.7886501914, 0),
        (66.6044558639, 23.3412339838, 0),
        (68.9918168684, 2.4995312483, 0),
        (69, -15.1617507, 0),
        (68.9097819337, -33.482625588, 0),
        (66.5754554789, -39.5613613027, 0),
        (63.8531997769, -45.8889097604, 0),
        (60.881320962, -48.3989838754, 0),
        (57.8075291455, -50.5790149861, 0),
    ]]
    chamfer(f10_c1_edges, length=F10_C1_SIZE)

    # F10_c2
    f10_c2_edges = [f3.edges().sort_by_distance(p)[0] for p in [
        (53.4055280093, -48.869721087, 0),
        (52.5, -45.3324646066, 0),
        (52.9170916803, -42.6656915254, 0),
    ]]
    chamfer(f10_c2_edges, length=F10_C2_SIZE)

    # F10_c3 (size 0.3 in the source; OpenCascade refuses exactly that, so slightly less here)
    f10_c3_edges = [f3.edges().sort_by_distance(p)[0] for p in [
        (52.9170916803, 42.6656915254, 0),
        (52.5, 45.3324646067, 0),
        (53.4055280093, 48.869721087, 0),
    ]]
    chamfer(f10_c3_edges, length=F10_C3_SIZE)

    # F10_c4
    f10_c4_edges = [f3.edges().sort_by_distance(p)[0] for p in [
        (55.8, -46, 0),
    ]]
    chamfer(f10_c4_edges, length=F10_C4_SIZE)

    # F10_c5
    f10_c5_edges = [f3.edges().sort_by_distance(p)[0] for p in [
        (61.9, -33.5, 0),
    ]]
    chamfer(f10_c5_edges, length=F10_C5_SIZE)

    # F10_c6
    f10_c6_edges = [f3.edges().sort_by_distance(p)[0] for p in [
        (55.8, 46, 0),
    ]]
    chamfer(f10_c6_edges, length=F10_C6_SIZE)

    # F10_c7
    f10_c7_edges = [f3.edges().sort_by_distance(p)[0] for p in [
        (61.9, 2.5, 0),
    ]]
    chamfer(f10_c7_edges, length=F10_C7_SIZE)

    # F10#s1: chamfer of 0.3 on 30 edges, made by hand

    # F10_s1_c1
    f10_s1_c1_edges = [f3.edges().sort_by_distance(p)[0] for p in [
        (-66.5754554789, 39.5613613027, 0),
        (-57.8075291455, 50.5790149861, 0),
        (-60.881320962, 48.3989838754, 0),
        (-63.8531997769, 45.8889097604, 0),
        (-68.9097819337, 33.482625588, 0),
        (-69, 0, 0),
        (-68.9097819337, -33.482625588, 0),
        (-66.5754554789, -39.5613613027, 0),
        (-63.8531997769, -45.8889097604, 0),
        (-60.881320962, -48.3989838754, 0),
        (-57.8075291455, -50.5790149861, 0),
    ]]
    chamfer(f10_s1_c1_edges, length=F10_S1_C1_SIZE)

    # F10_s1_c2
    f10_s1_c2_edges = [f3.edges().sort_by_distance(p)[0] for p in [
        (-53.4055280093, 48.869721087, 0),
        (-52.9170916803, 42.6656915254, 0),
        (-52.5, 45.3324646066, 0),
    ]]
    chamfer(f10_s1_c2_edges, length=F10_S1_C2_SIZE)

    # F10_s1_c3
    f10_s1_c3_edges = [f3.edges().sort_by_distance(p)[0] for p in [
        (-66.1, -33.5, 0),
    ]]
    chamfer(f10_s1_c3_edges, length=F10_S1_C3_SIZE)

    # F10_s1_c4
    f10_s1_c4_edges = [f3.edges().sort_by_distance(p)[0] for p in [
        (-59.2, -46, 0),
    ]]
    chamfer(f10_s1_c4_edges, length=F10_S1_C4_SIZE)

    # F10_s1_c5
    f10_s1_c5_edges = [f3.edges().sort_by_distance(p)[0] for p in [
        (-66.1, 33.5, 0),
    ]]
    chamfer(f10_s1_c5_edges, length=F10_S1_C5_SIZE)

    # F10_s1_c6
    f10_s1_c6_edges = [f3.edges().sort_by_distance(p)[0] for p in [
        (-59.2, 46, 0),
    ]]
    chamfer(f10_s1_c6_edges, length=F10_S1_C6_SIZE)


solid = f3.part
